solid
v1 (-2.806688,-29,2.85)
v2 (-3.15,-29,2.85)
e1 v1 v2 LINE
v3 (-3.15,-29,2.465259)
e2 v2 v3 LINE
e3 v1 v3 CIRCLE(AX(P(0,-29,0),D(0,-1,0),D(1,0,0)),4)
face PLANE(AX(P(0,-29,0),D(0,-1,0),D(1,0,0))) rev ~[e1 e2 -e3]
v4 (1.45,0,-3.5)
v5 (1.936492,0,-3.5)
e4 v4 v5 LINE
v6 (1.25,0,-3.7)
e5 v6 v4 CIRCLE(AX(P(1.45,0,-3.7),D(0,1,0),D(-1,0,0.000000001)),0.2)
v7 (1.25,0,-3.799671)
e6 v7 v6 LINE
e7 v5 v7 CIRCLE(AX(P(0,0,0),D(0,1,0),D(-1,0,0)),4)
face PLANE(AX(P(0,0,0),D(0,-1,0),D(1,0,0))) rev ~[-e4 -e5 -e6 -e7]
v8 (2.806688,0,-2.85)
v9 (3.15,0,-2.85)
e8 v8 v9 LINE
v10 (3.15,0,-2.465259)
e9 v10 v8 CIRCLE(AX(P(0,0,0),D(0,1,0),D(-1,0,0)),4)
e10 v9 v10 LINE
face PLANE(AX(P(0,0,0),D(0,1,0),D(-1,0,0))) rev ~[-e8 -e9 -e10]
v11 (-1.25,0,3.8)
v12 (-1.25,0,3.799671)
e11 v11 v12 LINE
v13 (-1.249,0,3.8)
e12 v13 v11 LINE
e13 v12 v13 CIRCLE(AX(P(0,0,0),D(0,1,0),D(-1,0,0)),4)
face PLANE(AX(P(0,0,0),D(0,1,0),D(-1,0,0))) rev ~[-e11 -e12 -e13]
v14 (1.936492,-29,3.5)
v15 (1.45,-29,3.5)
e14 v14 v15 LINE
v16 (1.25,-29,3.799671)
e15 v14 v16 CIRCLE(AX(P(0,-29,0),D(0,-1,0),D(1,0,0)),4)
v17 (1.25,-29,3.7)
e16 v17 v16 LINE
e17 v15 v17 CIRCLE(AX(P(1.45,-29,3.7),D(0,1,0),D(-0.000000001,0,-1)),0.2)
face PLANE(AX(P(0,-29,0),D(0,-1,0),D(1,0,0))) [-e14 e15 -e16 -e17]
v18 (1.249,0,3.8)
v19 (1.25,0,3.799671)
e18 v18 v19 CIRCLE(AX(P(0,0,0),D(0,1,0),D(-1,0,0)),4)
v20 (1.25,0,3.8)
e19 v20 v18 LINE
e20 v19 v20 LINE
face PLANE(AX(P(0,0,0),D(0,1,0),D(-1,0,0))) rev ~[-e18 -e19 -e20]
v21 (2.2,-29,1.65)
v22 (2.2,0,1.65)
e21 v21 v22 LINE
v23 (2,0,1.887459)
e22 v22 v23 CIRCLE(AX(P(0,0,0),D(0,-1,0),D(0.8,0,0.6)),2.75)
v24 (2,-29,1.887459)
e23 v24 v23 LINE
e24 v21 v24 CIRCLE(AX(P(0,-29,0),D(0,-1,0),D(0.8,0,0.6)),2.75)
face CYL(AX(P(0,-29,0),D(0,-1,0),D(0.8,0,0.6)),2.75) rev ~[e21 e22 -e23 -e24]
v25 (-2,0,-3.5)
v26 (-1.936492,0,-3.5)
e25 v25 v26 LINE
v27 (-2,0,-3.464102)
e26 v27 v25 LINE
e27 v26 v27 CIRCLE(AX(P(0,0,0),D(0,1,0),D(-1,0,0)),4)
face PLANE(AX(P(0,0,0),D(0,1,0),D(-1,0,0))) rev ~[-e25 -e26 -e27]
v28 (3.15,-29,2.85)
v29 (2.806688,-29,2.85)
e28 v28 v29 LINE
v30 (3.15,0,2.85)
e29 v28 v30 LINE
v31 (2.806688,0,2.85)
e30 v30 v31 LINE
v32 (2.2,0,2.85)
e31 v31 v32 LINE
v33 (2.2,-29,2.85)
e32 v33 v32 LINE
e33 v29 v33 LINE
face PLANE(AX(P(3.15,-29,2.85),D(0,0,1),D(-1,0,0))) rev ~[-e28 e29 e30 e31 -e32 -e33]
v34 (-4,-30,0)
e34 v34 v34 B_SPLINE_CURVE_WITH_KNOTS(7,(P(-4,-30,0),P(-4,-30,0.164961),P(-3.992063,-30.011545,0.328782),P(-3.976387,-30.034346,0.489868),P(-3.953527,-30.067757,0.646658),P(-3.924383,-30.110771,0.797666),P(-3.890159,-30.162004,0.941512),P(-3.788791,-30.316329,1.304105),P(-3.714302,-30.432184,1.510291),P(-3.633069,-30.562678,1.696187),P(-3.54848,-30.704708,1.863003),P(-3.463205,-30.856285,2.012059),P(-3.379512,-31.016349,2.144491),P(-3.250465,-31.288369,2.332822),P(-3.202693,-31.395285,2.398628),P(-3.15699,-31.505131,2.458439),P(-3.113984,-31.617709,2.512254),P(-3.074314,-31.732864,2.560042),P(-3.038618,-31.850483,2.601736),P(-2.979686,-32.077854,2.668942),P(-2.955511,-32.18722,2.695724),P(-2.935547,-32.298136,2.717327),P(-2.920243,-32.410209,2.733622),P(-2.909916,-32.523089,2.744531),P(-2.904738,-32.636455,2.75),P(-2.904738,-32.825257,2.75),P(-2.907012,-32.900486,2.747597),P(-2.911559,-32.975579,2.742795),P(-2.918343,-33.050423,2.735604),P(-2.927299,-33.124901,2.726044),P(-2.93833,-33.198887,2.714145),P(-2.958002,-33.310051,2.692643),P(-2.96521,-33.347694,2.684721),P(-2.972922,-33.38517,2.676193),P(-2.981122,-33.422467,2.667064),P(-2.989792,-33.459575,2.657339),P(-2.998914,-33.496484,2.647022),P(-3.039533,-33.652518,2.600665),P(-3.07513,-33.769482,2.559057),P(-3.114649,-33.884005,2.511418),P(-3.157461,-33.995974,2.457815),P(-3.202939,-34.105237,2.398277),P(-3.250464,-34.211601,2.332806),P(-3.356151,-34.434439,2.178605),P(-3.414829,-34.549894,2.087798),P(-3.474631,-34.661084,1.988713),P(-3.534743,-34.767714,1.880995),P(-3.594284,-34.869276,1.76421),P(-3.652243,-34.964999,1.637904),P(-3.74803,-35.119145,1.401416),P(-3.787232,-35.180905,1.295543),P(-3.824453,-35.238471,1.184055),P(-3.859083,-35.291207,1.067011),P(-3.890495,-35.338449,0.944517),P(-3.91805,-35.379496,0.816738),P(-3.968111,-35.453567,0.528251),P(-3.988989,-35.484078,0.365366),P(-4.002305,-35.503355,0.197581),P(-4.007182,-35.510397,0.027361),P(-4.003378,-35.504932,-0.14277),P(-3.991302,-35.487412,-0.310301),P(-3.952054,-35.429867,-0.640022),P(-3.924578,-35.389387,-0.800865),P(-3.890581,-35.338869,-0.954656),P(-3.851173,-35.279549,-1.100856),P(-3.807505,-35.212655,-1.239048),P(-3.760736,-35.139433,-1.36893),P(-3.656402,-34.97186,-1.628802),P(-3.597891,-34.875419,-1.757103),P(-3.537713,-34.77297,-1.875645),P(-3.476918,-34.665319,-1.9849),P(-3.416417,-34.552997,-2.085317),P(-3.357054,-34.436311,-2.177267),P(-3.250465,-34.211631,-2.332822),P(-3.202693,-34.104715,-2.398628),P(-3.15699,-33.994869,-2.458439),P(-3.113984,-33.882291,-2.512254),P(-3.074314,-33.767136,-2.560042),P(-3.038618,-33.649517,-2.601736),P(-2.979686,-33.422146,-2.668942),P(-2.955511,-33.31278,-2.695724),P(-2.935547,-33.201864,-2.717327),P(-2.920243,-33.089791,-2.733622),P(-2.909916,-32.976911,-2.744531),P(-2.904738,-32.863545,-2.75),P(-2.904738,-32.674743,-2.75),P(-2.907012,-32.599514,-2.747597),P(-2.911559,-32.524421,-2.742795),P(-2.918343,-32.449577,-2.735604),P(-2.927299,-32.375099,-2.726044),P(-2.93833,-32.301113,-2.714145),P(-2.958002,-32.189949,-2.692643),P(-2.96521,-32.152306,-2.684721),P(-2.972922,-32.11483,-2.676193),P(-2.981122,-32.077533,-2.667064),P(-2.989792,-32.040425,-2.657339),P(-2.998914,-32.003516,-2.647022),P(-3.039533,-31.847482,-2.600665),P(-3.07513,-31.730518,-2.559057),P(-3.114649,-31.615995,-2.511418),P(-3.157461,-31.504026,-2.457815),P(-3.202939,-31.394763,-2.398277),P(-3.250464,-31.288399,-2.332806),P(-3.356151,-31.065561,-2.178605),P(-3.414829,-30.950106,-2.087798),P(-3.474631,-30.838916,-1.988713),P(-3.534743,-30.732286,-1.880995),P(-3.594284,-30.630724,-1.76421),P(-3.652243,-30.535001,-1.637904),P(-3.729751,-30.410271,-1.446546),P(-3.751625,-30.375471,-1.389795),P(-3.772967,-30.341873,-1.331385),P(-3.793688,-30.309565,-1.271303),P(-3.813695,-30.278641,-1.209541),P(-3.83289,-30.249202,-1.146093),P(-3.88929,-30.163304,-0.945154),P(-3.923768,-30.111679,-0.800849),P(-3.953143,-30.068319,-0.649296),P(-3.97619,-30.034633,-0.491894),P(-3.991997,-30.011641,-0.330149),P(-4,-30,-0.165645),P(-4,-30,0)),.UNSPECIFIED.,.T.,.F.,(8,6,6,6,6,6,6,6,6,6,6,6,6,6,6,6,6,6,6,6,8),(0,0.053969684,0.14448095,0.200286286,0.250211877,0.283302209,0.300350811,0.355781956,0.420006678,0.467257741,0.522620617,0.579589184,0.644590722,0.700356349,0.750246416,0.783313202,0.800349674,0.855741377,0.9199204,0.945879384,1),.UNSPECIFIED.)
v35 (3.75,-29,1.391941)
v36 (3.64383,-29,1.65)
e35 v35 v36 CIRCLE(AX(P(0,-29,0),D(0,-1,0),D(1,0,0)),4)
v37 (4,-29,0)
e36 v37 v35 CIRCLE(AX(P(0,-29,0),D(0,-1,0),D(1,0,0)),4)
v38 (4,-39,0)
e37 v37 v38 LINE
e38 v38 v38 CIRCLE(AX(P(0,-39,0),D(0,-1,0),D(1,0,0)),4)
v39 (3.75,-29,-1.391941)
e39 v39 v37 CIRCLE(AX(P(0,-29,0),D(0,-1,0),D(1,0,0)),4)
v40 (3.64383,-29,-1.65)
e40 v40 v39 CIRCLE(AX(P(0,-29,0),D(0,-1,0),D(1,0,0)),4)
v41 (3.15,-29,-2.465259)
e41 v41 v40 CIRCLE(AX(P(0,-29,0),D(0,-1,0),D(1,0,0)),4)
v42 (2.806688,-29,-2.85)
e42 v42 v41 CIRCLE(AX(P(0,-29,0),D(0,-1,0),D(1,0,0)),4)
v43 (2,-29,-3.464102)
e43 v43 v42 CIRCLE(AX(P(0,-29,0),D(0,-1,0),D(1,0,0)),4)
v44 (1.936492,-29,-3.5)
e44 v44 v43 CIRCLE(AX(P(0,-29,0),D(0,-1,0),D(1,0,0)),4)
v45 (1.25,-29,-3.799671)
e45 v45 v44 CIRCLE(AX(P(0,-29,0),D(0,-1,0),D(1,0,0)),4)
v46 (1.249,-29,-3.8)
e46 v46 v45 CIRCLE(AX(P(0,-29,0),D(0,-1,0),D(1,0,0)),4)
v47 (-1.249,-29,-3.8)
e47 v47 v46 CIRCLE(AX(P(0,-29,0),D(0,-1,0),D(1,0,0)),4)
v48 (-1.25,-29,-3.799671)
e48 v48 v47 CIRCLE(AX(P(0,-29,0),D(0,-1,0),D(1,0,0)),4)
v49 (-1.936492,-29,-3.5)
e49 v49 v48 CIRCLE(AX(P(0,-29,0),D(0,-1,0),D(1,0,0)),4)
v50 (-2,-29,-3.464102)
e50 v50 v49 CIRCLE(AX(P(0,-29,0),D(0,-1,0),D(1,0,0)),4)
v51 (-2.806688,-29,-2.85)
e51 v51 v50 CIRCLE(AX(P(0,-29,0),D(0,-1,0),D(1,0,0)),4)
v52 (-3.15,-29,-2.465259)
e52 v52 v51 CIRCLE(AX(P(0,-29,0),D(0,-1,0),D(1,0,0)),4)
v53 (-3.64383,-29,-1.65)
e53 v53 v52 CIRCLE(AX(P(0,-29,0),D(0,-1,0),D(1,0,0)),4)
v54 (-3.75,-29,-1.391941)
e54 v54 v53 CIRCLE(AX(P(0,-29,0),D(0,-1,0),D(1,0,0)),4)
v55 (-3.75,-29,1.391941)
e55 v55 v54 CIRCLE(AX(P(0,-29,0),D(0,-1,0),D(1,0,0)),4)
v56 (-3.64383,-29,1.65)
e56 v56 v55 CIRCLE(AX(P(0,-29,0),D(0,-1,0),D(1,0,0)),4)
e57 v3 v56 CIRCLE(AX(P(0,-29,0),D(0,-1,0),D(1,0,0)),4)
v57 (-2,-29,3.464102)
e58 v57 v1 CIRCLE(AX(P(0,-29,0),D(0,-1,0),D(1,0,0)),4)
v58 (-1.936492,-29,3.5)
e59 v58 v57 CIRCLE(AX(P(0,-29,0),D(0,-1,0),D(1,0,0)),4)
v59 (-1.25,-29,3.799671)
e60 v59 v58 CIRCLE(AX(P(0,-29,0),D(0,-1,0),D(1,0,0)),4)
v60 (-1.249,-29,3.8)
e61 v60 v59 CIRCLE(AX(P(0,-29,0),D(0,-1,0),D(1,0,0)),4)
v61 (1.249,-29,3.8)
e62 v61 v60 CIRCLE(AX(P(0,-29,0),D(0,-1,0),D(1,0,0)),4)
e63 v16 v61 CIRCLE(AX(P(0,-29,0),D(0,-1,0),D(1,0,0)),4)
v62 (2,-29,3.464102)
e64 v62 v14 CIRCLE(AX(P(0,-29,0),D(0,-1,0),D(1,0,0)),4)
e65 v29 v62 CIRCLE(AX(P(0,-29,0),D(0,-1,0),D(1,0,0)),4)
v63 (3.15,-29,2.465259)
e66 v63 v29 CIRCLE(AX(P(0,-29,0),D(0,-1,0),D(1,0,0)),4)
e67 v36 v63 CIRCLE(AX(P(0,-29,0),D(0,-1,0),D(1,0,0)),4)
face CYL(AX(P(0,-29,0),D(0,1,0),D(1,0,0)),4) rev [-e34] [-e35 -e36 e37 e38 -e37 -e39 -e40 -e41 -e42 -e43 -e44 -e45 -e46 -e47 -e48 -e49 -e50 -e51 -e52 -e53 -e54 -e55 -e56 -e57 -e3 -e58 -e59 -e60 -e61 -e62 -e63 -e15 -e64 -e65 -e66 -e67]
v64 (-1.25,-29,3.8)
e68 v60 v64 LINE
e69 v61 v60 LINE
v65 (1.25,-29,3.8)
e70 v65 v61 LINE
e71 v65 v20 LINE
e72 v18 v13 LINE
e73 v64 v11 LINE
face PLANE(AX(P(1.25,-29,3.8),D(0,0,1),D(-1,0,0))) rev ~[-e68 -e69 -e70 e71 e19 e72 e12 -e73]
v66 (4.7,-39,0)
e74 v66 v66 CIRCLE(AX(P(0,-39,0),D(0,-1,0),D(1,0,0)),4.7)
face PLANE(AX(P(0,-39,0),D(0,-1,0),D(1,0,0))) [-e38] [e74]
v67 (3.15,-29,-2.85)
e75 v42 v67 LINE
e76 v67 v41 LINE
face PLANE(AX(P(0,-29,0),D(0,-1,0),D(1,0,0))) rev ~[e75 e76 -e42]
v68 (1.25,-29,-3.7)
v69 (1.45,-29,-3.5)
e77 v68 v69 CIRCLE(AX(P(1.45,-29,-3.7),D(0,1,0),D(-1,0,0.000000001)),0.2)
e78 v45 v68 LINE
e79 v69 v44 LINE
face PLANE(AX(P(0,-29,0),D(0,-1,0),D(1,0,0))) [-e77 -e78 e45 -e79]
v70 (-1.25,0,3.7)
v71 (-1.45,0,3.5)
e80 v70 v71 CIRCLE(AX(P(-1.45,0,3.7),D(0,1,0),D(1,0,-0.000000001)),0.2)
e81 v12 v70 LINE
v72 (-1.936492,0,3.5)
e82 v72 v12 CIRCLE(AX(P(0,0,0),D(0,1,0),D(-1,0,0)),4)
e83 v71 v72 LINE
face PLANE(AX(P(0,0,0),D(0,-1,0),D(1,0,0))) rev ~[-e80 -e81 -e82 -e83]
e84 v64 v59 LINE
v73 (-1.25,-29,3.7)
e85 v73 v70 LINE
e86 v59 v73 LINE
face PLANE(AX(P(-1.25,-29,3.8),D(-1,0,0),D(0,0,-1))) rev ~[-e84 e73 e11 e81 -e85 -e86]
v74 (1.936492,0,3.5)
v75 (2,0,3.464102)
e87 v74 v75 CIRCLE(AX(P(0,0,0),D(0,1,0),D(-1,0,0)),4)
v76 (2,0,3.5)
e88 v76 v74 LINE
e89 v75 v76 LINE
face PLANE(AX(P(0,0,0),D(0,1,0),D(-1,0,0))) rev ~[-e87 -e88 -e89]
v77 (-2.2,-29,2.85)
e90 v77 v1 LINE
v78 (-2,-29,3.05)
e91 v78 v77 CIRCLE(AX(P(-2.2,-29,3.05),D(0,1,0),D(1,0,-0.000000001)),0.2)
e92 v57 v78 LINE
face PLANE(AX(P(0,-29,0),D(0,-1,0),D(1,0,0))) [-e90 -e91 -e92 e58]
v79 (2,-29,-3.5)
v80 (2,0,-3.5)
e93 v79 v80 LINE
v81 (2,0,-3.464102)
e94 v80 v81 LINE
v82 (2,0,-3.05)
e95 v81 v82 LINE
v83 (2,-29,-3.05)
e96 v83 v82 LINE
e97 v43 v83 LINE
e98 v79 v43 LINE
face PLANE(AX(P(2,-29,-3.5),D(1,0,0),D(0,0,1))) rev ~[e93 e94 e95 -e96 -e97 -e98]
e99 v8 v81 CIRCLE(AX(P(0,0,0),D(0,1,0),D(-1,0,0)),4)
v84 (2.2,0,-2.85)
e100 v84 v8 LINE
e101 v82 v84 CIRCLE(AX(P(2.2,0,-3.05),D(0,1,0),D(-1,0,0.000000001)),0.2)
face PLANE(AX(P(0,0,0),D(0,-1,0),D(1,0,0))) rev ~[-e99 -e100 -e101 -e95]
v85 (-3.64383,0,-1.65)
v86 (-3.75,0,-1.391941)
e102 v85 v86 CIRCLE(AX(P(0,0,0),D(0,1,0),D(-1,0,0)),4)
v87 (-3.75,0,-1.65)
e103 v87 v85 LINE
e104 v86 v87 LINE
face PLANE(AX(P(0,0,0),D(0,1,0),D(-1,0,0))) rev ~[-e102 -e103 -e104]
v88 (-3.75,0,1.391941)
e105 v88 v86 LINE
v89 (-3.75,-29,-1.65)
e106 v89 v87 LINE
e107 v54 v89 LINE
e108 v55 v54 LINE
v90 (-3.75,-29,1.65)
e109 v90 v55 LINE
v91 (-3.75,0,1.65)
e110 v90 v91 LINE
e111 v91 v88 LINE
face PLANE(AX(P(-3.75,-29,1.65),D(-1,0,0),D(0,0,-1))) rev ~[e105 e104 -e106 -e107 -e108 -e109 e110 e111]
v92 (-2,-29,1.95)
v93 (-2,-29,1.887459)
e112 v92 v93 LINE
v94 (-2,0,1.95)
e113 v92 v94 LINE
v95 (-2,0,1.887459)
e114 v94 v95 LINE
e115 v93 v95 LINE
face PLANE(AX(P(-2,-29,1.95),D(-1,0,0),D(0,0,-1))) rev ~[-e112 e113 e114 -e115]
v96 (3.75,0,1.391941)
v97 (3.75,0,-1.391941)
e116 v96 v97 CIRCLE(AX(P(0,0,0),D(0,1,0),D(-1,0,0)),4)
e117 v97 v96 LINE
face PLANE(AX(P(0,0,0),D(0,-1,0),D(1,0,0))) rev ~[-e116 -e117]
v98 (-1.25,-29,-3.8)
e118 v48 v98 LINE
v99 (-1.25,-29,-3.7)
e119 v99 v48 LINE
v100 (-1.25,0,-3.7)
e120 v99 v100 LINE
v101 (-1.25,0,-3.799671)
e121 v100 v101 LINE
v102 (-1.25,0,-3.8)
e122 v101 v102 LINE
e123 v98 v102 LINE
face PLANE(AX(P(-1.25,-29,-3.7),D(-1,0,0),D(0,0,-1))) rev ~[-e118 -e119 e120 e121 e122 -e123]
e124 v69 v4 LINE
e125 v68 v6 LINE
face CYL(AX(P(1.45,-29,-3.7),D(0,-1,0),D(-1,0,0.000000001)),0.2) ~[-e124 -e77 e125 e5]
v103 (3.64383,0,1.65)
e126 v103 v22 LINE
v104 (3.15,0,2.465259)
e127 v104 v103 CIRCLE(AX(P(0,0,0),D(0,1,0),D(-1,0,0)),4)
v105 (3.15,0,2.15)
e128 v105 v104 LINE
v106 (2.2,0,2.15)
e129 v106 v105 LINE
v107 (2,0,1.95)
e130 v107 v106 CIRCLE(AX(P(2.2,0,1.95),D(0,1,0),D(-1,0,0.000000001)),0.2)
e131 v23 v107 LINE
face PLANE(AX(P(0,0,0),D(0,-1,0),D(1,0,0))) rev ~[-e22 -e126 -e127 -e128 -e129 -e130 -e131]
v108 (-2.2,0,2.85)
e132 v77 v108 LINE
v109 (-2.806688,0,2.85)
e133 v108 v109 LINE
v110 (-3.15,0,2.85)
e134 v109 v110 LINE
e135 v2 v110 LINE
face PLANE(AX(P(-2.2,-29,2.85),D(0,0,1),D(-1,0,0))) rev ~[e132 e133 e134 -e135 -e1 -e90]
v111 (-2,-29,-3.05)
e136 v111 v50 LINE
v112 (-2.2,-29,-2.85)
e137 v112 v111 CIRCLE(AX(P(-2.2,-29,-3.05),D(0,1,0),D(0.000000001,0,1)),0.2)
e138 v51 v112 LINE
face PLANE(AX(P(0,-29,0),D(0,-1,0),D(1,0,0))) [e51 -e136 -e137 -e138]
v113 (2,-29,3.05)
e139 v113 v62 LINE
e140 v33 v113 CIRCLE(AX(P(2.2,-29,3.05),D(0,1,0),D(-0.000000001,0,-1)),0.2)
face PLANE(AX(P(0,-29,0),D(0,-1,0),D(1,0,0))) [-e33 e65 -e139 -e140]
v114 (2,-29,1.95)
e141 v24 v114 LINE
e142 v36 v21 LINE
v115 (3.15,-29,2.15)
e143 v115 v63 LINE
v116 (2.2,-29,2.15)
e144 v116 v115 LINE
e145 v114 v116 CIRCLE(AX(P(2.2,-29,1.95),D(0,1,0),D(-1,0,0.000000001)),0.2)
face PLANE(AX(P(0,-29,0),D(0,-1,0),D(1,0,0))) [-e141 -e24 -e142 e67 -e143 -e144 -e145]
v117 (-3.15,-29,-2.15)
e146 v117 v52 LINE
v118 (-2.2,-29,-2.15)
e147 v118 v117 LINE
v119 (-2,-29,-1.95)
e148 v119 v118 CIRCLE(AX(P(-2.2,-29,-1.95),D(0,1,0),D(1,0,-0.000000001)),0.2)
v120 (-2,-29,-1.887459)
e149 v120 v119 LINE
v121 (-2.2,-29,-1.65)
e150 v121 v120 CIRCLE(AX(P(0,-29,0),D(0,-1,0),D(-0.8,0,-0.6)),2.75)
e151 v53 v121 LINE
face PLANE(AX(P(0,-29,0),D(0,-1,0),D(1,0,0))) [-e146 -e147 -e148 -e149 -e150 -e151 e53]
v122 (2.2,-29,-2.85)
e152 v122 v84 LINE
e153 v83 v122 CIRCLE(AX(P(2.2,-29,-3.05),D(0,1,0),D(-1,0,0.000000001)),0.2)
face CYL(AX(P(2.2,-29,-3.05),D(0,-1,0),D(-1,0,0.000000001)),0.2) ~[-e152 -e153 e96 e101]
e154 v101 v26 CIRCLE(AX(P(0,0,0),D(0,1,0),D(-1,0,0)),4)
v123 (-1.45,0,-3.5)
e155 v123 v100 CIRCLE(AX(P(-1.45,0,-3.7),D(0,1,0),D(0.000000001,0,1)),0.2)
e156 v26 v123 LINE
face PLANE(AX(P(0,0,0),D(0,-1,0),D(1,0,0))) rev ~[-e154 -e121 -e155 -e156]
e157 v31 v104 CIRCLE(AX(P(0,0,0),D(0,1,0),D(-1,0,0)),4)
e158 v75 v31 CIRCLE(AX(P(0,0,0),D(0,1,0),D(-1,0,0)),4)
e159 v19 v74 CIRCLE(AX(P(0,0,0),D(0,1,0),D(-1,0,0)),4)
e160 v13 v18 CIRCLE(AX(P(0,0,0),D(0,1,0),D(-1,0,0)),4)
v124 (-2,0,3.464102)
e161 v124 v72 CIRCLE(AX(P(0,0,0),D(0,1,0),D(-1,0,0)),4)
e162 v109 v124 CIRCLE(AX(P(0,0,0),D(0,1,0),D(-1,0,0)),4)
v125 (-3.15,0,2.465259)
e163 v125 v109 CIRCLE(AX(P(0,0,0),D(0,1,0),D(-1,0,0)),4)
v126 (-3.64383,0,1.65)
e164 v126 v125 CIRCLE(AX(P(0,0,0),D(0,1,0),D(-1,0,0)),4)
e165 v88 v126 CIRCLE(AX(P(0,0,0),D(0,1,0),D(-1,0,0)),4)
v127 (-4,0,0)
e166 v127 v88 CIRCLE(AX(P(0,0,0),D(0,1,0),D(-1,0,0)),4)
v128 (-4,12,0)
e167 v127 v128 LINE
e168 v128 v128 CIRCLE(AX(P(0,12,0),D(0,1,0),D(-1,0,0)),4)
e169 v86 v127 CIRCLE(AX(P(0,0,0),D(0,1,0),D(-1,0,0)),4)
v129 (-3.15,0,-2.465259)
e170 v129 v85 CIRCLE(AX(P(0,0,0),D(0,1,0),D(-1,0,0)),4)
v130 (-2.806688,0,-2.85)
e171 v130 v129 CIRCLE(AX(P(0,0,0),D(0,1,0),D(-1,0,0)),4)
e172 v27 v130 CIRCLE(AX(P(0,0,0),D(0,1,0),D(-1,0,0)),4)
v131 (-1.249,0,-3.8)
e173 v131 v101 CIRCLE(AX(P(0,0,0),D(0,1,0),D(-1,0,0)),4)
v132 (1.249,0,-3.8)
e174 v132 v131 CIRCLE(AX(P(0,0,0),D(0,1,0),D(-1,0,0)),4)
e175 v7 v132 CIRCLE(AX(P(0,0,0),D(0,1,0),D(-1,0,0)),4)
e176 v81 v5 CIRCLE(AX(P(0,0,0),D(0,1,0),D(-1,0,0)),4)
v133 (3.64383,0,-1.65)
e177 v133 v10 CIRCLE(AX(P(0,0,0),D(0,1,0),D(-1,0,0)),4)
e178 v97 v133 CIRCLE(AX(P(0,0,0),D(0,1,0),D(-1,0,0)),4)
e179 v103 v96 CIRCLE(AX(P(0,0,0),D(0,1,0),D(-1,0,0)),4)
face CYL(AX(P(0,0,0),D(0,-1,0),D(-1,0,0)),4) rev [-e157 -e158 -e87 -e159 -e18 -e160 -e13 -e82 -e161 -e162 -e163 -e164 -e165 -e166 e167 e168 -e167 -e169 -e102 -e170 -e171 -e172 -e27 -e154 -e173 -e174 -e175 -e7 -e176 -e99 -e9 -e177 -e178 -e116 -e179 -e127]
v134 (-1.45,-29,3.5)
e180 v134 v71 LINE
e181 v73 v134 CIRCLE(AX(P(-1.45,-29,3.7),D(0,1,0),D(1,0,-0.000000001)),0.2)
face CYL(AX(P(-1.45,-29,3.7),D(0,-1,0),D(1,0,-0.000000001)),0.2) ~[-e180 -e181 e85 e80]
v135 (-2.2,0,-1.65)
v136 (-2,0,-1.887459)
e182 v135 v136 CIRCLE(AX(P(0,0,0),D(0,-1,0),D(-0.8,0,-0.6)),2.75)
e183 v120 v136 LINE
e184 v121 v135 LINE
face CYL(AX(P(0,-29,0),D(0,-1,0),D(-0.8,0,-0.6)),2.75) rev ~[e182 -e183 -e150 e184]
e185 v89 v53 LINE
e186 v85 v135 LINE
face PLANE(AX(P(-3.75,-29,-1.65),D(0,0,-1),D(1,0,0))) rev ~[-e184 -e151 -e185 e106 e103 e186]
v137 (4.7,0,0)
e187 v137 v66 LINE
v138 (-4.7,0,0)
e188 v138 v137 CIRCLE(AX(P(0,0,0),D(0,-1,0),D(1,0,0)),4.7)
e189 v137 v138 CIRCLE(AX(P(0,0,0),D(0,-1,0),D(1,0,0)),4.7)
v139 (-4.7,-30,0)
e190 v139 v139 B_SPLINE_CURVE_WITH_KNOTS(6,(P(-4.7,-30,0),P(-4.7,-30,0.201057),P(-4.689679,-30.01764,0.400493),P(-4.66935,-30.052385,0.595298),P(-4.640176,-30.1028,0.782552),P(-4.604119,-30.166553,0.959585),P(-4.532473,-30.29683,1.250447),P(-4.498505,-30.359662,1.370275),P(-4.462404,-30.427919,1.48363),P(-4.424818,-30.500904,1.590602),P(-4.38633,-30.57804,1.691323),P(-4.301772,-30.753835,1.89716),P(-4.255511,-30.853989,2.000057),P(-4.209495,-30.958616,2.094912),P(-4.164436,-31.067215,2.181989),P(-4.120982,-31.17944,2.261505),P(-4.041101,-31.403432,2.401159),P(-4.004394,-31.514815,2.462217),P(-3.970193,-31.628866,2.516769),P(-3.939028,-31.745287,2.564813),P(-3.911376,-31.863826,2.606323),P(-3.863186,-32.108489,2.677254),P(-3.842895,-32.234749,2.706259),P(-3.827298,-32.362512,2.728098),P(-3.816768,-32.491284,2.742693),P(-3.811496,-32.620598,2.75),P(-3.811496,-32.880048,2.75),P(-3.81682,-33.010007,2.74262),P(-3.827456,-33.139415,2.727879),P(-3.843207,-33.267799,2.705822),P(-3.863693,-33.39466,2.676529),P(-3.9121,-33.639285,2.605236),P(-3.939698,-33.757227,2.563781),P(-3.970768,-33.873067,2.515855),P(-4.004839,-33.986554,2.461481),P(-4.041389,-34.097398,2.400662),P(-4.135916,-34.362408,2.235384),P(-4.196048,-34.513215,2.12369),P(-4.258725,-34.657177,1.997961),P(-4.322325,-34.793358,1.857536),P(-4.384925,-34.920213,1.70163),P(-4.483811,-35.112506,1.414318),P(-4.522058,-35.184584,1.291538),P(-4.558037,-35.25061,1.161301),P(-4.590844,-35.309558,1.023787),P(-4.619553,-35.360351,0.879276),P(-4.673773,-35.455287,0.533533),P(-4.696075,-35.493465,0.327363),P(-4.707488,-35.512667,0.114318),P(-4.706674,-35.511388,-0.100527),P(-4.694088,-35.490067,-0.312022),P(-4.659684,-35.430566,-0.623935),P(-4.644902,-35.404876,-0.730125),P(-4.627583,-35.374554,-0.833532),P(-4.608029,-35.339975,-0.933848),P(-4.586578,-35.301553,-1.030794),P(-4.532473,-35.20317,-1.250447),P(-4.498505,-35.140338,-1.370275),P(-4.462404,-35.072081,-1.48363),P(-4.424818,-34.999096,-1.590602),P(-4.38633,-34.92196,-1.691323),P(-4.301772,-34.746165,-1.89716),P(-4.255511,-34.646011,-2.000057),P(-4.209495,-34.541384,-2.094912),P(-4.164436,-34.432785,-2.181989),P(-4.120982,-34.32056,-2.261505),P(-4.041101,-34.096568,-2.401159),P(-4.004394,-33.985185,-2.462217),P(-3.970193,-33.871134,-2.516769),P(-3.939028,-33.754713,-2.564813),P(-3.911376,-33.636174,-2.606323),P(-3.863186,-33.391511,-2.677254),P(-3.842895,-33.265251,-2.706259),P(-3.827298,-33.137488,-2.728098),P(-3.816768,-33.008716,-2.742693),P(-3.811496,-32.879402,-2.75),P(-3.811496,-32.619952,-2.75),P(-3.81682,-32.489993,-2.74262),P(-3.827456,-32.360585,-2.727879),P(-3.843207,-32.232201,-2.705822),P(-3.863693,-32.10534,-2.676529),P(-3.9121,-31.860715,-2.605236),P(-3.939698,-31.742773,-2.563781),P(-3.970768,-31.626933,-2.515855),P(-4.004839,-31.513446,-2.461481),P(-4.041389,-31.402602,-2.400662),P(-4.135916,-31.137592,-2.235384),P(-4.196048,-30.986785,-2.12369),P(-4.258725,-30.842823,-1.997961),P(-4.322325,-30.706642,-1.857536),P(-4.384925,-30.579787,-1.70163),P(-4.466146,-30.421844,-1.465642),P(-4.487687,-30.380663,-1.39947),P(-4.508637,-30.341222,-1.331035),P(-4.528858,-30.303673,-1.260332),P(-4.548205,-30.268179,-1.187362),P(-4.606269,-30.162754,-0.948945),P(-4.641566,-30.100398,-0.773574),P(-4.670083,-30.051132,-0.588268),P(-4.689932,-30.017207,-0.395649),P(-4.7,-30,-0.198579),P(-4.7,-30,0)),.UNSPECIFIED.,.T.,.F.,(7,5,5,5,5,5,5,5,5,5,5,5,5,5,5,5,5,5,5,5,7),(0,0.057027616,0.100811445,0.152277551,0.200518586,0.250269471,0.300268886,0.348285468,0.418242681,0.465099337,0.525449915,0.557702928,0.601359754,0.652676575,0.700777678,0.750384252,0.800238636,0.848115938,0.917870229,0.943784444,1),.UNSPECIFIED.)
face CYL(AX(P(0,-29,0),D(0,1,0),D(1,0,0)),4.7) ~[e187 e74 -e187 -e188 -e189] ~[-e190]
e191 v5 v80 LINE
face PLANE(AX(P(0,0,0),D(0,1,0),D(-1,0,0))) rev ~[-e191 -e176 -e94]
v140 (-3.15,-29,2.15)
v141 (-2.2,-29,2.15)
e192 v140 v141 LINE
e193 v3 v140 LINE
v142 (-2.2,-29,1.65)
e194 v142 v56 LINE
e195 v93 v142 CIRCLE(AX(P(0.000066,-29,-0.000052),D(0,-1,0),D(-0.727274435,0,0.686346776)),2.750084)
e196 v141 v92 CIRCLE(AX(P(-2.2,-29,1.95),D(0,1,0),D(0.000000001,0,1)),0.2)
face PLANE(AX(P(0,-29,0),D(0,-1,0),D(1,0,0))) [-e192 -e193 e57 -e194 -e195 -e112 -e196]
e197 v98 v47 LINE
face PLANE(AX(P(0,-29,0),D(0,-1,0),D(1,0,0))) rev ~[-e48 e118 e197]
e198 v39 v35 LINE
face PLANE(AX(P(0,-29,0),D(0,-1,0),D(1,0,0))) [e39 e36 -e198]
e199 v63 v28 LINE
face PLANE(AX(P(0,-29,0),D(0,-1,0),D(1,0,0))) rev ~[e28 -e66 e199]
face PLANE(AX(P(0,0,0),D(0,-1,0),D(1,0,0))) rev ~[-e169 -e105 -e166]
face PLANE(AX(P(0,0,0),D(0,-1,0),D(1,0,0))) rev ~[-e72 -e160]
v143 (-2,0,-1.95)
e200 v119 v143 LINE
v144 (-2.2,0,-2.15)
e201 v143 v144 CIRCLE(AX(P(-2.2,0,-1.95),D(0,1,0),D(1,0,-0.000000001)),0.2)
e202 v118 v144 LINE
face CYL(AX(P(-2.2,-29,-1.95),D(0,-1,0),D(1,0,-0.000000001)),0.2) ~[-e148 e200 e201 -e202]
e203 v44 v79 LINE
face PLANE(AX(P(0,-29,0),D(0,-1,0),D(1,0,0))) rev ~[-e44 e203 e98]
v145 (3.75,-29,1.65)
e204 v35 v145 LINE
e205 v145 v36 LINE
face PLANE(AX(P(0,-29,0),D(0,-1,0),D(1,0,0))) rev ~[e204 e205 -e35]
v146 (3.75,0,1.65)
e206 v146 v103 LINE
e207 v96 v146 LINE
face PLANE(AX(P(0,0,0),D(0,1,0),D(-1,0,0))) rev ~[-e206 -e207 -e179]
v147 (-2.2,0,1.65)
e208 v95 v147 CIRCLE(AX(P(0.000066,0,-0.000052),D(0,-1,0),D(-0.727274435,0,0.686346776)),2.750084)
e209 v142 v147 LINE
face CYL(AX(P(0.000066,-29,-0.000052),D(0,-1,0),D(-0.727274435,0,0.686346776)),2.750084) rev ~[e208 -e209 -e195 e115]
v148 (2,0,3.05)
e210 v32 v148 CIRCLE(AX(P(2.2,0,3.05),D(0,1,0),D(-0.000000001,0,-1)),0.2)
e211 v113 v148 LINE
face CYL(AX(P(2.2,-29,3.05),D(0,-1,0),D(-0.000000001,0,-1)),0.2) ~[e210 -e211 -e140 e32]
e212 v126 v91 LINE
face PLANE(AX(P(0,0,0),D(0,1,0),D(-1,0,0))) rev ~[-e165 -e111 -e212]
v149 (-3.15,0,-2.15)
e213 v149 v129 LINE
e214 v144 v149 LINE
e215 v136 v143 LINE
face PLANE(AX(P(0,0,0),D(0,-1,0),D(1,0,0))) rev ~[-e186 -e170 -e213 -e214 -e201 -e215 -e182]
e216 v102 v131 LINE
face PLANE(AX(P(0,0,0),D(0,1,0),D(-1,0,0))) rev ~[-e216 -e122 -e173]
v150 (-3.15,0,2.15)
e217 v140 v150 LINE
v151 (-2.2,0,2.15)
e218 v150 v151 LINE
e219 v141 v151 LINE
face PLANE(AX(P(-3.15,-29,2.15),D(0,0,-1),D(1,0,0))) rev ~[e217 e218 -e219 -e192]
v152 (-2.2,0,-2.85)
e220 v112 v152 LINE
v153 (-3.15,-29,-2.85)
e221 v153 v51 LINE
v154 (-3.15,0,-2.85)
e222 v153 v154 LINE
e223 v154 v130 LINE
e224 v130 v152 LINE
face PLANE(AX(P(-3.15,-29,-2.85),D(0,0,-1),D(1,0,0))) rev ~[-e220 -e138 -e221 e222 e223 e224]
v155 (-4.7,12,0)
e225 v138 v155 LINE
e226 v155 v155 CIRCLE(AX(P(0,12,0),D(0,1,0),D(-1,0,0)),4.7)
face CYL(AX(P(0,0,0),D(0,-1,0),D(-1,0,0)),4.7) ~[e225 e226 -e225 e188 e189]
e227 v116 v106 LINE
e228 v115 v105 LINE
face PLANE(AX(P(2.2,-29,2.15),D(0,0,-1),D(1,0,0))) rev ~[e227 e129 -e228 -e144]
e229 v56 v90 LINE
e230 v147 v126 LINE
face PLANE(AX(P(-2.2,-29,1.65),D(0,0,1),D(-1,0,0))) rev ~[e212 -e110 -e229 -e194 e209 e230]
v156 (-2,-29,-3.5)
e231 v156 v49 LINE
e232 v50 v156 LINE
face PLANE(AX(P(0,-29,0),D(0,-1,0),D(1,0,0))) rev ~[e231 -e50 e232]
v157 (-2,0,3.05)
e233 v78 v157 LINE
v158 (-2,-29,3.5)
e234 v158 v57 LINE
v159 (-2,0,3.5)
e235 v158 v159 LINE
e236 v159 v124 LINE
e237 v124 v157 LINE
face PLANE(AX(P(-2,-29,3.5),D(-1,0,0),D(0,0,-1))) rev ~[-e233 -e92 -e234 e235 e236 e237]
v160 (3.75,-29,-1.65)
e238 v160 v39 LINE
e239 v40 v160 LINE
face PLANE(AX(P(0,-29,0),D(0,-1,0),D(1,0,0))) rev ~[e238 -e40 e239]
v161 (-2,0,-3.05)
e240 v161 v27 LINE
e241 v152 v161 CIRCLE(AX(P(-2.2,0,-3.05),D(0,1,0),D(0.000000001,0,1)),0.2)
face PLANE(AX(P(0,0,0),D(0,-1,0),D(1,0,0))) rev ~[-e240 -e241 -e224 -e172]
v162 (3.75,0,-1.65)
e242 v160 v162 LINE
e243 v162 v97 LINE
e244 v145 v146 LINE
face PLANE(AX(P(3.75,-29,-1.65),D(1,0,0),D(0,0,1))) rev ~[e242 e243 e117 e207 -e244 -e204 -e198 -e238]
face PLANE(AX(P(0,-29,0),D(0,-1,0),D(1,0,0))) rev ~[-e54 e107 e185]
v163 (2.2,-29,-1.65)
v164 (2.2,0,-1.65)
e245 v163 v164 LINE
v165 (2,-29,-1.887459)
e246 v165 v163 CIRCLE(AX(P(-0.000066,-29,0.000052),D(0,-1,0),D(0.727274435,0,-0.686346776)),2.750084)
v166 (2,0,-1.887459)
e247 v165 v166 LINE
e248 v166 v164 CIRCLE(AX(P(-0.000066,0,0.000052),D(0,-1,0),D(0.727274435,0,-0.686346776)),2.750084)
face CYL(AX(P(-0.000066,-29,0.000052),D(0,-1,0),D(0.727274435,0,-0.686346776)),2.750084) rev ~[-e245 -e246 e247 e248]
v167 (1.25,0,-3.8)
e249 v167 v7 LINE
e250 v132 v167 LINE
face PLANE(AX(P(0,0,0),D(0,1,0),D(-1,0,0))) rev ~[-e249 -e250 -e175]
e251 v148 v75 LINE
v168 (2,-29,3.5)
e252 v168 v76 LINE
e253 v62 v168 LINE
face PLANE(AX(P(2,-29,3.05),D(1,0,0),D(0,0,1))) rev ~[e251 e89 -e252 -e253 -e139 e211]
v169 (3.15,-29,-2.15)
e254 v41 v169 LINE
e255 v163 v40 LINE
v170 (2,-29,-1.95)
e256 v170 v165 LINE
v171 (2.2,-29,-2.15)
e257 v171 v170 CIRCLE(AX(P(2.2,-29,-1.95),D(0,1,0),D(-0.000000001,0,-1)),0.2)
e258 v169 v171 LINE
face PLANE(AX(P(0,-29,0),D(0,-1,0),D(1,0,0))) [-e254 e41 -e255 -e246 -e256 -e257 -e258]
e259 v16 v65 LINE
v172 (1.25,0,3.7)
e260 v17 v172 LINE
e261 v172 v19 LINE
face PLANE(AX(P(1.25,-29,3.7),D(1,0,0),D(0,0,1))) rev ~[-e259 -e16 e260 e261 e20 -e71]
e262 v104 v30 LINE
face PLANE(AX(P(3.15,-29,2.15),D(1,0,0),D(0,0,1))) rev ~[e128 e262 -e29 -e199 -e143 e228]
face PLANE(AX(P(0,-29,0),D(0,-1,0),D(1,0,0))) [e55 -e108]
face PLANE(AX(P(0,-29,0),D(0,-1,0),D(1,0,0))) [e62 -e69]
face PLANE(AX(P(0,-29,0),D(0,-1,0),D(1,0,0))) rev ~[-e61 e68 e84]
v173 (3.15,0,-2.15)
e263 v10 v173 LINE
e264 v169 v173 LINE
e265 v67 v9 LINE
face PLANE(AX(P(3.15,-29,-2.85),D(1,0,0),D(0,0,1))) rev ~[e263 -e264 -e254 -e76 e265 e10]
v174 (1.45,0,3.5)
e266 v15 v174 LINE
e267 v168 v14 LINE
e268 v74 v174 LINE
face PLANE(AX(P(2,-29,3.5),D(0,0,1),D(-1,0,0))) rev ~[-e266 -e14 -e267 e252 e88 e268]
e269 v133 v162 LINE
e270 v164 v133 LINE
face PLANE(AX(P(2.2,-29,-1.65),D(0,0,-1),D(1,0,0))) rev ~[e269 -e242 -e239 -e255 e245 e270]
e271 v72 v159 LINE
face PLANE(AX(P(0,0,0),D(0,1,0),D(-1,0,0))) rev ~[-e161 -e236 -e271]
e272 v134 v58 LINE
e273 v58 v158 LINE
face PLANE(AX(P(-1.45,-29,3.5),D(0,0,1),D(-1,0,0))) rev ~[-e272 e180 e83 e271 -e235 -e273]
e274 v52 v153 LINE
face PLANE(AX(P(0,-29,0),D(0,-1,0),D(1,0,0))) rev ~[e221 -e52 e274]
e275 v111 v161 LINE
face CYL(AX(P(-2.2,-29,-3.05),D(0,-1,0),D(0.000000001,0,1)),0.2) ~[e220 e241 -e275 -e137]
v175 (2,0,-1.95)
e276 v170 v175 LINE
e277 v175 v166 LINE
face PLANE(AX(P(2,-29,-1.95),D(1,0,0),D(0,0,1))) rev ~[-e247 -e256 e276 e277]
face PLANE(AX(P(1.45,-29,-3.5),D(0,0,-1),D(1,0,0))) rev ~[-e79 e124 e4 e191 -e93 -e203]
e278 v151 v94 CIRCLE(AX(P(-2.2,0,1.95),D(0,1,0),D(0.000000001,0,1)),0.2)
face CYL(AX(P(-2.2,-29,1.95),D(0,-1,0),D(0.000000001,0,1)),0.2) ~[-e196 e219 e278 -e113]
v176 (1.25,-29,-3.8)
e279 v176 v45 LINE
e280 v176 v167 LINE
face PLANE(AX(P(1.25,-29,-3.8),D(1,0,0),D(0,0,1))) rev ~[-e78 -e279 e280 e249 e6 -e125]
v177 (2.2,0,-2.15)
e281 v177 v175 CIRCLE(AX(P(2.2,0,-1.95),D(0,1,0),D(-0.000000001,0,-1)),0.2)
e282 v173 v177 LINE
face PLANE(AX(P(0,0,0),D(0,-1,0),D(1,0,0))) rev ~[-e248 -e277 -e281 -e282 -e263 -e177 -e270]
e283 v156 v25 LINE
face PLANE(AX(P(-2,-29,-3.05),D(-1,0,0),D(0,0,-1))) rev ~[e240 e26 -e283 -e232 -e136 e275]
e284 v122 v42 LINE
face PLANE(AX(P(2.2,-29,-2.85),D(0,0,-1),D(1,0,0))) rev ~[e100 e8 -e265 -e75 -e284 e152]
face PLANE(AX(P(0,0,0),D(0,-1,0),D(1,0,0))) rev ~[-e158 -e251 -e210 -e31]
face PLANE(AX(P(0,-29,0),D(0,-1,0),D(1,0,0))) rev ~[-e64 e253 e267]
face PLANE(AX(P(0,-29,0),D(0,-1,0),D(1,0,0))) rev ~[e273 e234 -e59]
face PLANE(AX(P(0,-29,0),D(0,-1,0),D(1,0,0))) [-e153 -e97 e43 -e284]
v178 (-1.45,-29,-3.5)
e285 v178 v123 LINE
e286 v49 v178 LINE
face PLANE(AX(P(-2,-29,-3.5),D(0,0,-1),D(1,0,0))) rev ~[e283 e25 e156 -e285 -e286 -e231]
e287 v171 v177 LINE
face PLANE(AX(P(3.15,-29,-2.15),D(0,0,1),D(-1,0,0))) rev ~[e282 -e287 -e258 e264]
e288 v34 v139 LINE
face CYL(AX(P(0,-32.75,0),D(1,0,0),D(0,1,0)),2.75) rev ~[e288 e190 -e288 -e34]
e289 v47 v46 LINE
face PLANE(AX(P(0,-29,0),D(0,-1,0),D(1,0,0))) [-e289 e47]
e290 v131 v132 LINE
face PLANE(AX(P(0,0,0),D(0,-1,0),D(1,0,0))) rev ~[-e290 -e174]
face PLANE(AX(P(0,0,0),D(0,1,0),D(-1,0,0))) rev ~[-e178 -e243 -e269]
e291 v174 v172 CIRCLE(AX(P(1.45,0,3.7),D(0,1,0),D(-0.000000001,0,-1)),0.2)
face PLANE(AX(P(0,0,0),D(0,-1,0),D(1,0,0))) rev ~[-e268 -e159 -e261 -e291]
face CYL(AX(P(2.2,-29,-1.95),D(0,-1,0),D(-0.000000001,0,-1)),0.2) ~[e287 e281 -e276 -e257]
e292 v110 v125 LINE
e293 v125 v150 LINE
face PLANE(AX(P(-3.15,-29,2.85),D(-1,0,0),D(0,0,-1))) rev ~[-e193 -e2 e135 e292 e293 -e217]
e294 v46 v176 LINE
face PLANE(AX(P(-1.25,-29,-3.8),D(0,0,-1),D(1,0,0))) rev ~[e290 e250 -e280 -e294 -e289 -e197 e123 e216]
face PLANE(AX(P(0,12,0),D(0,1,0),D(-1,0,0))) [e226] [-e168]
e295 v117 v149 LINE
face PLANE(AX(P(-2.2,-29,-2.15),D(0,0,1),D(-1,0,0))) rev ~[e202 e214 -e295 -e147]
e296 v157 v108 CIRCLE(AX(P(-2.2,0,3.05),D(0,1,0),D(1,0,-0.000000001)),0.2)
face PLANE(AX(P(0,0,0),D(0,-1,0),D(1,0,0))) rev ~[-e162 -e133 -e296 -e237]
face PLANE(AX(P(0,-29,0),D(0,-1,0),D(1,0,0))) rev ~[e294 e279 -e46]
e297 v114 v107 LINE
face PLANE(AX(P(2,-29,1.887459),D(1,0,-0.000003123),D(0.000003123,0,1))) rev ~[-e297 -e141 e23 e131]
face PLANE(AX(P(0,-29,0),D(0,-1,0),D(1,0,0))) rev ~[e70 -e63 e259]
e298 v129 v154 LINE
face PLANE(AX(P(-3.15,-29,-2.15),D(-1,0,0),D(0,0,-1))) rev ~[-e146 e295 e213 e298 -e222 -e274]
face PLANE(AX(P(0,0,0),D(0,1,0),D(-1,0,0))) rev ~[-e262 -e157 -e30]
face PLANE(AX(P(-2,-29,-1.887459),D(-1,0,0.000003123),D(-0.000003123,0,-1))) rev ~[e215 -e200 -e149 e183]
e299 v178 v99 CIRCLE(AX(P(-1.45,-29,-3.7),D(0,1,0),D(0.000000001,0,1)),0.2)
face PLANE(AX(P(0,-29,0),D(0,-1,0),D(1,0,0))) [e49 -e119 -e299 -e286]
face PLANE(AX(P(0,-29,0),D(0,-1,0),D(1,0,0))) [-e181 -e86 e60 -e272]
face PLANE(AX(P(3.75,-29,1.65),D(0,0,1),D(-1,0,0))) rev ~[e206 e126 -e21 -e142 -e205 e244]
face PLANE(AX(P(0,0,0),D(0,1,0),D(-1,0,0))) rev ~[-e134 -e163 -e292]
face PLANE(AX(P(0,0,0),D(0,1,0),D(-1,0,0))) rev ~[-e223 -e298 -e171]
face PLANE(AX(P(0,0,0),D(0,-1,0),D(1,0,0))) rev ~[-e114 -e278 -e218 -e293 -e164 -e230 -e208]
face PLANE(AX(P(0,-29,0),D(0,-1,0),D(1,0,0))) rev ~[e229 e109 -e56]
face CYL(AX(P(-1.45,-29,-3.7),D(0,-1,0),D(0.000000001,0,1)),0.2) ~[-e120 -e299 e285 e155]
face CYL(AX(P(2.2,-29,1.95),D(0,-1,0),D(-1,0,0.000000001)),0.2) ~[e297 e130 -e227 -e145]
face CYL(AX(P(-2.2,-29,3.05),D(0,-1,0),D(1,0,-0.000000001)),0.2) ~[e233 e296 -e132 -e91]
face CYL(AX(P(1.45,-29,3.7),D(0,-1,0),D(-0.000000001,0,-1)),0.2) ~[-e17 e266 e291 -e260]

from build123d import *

# Parameters (mm, degrees)
F3_R      = 4.7
F4_DEPTH  = 29
F8_DEPTH  = 29
F6_R      = 4.7
F6_R_2    = 4
F9_DEPTH  = 10
F7_R      = 4.7
F7_R_2    = 4
F10_DEPTH = 12
F11_R     = 2.75
F12_DEPTH = 4.701


# Not quite as in the source:
# - ends of sketch curves that miss each other by under 0.0002 mm in the source are joined


with BuildPart() as f4:
    # F3 (on Front) → F4 (new body)
    with BuildSketch(Plane.XZ):
        Circle(F3_R)
    extrude(amount=F4_DEPTH)

    # F5 (on face) → F8 (cut, through all)
    with BuildSketch(Plane.XZ.offset(29)):
        with BuildLine():
            Line((-1.25, -3.8), (0, -3.8))
            Line((0, -3.8), (1.25, -3.8))
            Line((1.25, -3.8), (1.25, -3.7))
            ThreePointArc((1.25, -3.7), (1.3085786438, -3.5585786438), (1.45, -3.5))
            Line((1.45, -3.5), (2, -3.5))
            Line((2, -3.5), (2, -3.05))
            ThreePointArc((2, -3.05), (2.0585786438, -2.9085786438), (2.2, -2.85))
            Line((2.2, -2.85), (3.15, -2.85))
            Line((3.15, -2.85), (3.15, -2.15))
            Line((3.15, -2.15), (2.2, -2.15))
            ThreePointArc((2.2, -2.15), (2.0585786438, -2.0914213562), (2, -1.95))
            Line((2, -1.95), (2, -1.887459))
            ThreePointArc((2, -1.887459), (2.1033535752, -1.771554046), (2.2, -1.65))
            Line((2.2, -1.65), (3.75, -1.65))
            Line((3.75, -1.65), (3.75, 0))
            Line((3.75, 0), (3.75, 1.65))
            Line((3.75, 1.65), (2.2, 1.65))
            ThreePointArc((2.2, 1.65), (2.1033535752, 1.771554046), (1.9999998047, 1.8874588157))
            Line((1.9999998047, 1.8874588157), (2, 1.95))
            ThreePointArc((2, 1.95), (2.0585786438, 2.0914213562), (2.2, 2.15))
            Line((2.2, 2.15), (3.15, 2.15))
            Line((3.15, 2.15), (3.15, 2.85))
            Line((3.15, 2.85), (2.2, 2.85))
            ThreePointArc((2.2, 2.85), (2.0585786438, 2.9085786438), (2, 3.05))
            Line((2, 3.05), (2, 3.5))
            Line((2, 3.5), (1.45, 3.5))
            ThreePointArc((1.45, 3.5), (1.3085786438, 3.5585786438), (1.25, 3.7))
            Line((1.25, 3.7), (1.25, 3.8))
            Line((1.25, 3.8), (0, 3.8))
            Line((0, 3.8), (-1.25, 3.8))
            Line((-1.25, 3.8), (-1.25, 3.7))
            ThreePointArc((-1.25, 3.7), (-1.3085786438, 3.5585786438), (-1.45, 3.5))
            Line((-1.45, 3.5), (-2, 3.5))
            Line((-2, 3.5), (-2, 3.05))
            ThreePointArc((-2, 3.05), (-2.0585786438, 2.9085786438), (-2.2, 2.85))
            Line((-2.2, 2.85), (-3.15, 2.85))
            Line((-3.15, 2.85), (-3.15, 2.15))
            Line((-3.15, 2.15), (-2.2, 2.15))
            ThreePointArc((-2.2, 2.15), (-2.0585786438, 2.0914213562), (-2, 1.95))
            Line((-2, 1.95), (-2, 1.887459))
            ThreePointArc((-2, 1.887459), (-2.1033535752, 1.771554046), (-2.2, 1.65))
            Line((-2.2, 1.65), (-3.75, 1.65))
            Line((-3.75, 1.65), (-3.75, 0))
            Line((-3.75, 0), (-3.75, -1.65))
            Line((-3.75, -1.65), (-2.2, -1.65))
            ThreePointArc((-2.2, -1.65), (-2.1033535752, -1.771554046), (-1.9999998047, -1.8874588157))
            Line((-1.9999998047, -1.8874588157), (-2, -1.95))
            ThreePointArc((-2, -1.95), (-2.0585786438, -2.0914213562), (-2.2, -2.15))
            Line((-2.2, -2.15), (-3.15, -2.15))
            Line((-3.15, -2.15), (-3.15, -2.85))
            Line((-3.15, -2.85), (-2.2, -2.85))
            ThreePointArc((-2.2, -2.85), (-2.0585786438, -2.9085786438), (-2, -3.05))
            Line((-2, -3.05), (-2, -3.5))
            Line((-2, -3.5), (-1.45, -3.5))
            ThreePointArc((-1.45, -3.5), (-1.3085786438, -3.5585786438), (-1.25, -3.7))
            Line((-1.25, -3.7), (-1.25, -3.8))
        make_face()
    extrude(amount=-F8_DEPTH, mode=Mode.SUBTRACT)

    # F6 (on face) → F9 (join)
    with BuildSketch(Plane.XZ.offset(29)):
        Circle(F6_R)
        Circle(F6_R_2, mode=Mode.SUBTRACT)
    extrude(amount=F9_DEPTH)

    # F7 (on face) → F10 (join)
    with BuildSketch(Plane(origin=(0, 0, 0), x_dir=(-1, 0, 0), z_dir=(0, 1, 0))):
        Circle(F7_R)
        Circle(F7_R_2, mode=Mode.SUBTRACT)
    extrude(amount=F10_DEPTH)

    # F11 (on Right) → F12 (cut, through all)
    with BuildSketch(Plane.YZ):
        with Locations((-32.75, 0)):
            Circle(F11_R)
    extrude(amount=-F12_DEPTH, mode=Mode.SUBTRACT)


solid = f4.part
